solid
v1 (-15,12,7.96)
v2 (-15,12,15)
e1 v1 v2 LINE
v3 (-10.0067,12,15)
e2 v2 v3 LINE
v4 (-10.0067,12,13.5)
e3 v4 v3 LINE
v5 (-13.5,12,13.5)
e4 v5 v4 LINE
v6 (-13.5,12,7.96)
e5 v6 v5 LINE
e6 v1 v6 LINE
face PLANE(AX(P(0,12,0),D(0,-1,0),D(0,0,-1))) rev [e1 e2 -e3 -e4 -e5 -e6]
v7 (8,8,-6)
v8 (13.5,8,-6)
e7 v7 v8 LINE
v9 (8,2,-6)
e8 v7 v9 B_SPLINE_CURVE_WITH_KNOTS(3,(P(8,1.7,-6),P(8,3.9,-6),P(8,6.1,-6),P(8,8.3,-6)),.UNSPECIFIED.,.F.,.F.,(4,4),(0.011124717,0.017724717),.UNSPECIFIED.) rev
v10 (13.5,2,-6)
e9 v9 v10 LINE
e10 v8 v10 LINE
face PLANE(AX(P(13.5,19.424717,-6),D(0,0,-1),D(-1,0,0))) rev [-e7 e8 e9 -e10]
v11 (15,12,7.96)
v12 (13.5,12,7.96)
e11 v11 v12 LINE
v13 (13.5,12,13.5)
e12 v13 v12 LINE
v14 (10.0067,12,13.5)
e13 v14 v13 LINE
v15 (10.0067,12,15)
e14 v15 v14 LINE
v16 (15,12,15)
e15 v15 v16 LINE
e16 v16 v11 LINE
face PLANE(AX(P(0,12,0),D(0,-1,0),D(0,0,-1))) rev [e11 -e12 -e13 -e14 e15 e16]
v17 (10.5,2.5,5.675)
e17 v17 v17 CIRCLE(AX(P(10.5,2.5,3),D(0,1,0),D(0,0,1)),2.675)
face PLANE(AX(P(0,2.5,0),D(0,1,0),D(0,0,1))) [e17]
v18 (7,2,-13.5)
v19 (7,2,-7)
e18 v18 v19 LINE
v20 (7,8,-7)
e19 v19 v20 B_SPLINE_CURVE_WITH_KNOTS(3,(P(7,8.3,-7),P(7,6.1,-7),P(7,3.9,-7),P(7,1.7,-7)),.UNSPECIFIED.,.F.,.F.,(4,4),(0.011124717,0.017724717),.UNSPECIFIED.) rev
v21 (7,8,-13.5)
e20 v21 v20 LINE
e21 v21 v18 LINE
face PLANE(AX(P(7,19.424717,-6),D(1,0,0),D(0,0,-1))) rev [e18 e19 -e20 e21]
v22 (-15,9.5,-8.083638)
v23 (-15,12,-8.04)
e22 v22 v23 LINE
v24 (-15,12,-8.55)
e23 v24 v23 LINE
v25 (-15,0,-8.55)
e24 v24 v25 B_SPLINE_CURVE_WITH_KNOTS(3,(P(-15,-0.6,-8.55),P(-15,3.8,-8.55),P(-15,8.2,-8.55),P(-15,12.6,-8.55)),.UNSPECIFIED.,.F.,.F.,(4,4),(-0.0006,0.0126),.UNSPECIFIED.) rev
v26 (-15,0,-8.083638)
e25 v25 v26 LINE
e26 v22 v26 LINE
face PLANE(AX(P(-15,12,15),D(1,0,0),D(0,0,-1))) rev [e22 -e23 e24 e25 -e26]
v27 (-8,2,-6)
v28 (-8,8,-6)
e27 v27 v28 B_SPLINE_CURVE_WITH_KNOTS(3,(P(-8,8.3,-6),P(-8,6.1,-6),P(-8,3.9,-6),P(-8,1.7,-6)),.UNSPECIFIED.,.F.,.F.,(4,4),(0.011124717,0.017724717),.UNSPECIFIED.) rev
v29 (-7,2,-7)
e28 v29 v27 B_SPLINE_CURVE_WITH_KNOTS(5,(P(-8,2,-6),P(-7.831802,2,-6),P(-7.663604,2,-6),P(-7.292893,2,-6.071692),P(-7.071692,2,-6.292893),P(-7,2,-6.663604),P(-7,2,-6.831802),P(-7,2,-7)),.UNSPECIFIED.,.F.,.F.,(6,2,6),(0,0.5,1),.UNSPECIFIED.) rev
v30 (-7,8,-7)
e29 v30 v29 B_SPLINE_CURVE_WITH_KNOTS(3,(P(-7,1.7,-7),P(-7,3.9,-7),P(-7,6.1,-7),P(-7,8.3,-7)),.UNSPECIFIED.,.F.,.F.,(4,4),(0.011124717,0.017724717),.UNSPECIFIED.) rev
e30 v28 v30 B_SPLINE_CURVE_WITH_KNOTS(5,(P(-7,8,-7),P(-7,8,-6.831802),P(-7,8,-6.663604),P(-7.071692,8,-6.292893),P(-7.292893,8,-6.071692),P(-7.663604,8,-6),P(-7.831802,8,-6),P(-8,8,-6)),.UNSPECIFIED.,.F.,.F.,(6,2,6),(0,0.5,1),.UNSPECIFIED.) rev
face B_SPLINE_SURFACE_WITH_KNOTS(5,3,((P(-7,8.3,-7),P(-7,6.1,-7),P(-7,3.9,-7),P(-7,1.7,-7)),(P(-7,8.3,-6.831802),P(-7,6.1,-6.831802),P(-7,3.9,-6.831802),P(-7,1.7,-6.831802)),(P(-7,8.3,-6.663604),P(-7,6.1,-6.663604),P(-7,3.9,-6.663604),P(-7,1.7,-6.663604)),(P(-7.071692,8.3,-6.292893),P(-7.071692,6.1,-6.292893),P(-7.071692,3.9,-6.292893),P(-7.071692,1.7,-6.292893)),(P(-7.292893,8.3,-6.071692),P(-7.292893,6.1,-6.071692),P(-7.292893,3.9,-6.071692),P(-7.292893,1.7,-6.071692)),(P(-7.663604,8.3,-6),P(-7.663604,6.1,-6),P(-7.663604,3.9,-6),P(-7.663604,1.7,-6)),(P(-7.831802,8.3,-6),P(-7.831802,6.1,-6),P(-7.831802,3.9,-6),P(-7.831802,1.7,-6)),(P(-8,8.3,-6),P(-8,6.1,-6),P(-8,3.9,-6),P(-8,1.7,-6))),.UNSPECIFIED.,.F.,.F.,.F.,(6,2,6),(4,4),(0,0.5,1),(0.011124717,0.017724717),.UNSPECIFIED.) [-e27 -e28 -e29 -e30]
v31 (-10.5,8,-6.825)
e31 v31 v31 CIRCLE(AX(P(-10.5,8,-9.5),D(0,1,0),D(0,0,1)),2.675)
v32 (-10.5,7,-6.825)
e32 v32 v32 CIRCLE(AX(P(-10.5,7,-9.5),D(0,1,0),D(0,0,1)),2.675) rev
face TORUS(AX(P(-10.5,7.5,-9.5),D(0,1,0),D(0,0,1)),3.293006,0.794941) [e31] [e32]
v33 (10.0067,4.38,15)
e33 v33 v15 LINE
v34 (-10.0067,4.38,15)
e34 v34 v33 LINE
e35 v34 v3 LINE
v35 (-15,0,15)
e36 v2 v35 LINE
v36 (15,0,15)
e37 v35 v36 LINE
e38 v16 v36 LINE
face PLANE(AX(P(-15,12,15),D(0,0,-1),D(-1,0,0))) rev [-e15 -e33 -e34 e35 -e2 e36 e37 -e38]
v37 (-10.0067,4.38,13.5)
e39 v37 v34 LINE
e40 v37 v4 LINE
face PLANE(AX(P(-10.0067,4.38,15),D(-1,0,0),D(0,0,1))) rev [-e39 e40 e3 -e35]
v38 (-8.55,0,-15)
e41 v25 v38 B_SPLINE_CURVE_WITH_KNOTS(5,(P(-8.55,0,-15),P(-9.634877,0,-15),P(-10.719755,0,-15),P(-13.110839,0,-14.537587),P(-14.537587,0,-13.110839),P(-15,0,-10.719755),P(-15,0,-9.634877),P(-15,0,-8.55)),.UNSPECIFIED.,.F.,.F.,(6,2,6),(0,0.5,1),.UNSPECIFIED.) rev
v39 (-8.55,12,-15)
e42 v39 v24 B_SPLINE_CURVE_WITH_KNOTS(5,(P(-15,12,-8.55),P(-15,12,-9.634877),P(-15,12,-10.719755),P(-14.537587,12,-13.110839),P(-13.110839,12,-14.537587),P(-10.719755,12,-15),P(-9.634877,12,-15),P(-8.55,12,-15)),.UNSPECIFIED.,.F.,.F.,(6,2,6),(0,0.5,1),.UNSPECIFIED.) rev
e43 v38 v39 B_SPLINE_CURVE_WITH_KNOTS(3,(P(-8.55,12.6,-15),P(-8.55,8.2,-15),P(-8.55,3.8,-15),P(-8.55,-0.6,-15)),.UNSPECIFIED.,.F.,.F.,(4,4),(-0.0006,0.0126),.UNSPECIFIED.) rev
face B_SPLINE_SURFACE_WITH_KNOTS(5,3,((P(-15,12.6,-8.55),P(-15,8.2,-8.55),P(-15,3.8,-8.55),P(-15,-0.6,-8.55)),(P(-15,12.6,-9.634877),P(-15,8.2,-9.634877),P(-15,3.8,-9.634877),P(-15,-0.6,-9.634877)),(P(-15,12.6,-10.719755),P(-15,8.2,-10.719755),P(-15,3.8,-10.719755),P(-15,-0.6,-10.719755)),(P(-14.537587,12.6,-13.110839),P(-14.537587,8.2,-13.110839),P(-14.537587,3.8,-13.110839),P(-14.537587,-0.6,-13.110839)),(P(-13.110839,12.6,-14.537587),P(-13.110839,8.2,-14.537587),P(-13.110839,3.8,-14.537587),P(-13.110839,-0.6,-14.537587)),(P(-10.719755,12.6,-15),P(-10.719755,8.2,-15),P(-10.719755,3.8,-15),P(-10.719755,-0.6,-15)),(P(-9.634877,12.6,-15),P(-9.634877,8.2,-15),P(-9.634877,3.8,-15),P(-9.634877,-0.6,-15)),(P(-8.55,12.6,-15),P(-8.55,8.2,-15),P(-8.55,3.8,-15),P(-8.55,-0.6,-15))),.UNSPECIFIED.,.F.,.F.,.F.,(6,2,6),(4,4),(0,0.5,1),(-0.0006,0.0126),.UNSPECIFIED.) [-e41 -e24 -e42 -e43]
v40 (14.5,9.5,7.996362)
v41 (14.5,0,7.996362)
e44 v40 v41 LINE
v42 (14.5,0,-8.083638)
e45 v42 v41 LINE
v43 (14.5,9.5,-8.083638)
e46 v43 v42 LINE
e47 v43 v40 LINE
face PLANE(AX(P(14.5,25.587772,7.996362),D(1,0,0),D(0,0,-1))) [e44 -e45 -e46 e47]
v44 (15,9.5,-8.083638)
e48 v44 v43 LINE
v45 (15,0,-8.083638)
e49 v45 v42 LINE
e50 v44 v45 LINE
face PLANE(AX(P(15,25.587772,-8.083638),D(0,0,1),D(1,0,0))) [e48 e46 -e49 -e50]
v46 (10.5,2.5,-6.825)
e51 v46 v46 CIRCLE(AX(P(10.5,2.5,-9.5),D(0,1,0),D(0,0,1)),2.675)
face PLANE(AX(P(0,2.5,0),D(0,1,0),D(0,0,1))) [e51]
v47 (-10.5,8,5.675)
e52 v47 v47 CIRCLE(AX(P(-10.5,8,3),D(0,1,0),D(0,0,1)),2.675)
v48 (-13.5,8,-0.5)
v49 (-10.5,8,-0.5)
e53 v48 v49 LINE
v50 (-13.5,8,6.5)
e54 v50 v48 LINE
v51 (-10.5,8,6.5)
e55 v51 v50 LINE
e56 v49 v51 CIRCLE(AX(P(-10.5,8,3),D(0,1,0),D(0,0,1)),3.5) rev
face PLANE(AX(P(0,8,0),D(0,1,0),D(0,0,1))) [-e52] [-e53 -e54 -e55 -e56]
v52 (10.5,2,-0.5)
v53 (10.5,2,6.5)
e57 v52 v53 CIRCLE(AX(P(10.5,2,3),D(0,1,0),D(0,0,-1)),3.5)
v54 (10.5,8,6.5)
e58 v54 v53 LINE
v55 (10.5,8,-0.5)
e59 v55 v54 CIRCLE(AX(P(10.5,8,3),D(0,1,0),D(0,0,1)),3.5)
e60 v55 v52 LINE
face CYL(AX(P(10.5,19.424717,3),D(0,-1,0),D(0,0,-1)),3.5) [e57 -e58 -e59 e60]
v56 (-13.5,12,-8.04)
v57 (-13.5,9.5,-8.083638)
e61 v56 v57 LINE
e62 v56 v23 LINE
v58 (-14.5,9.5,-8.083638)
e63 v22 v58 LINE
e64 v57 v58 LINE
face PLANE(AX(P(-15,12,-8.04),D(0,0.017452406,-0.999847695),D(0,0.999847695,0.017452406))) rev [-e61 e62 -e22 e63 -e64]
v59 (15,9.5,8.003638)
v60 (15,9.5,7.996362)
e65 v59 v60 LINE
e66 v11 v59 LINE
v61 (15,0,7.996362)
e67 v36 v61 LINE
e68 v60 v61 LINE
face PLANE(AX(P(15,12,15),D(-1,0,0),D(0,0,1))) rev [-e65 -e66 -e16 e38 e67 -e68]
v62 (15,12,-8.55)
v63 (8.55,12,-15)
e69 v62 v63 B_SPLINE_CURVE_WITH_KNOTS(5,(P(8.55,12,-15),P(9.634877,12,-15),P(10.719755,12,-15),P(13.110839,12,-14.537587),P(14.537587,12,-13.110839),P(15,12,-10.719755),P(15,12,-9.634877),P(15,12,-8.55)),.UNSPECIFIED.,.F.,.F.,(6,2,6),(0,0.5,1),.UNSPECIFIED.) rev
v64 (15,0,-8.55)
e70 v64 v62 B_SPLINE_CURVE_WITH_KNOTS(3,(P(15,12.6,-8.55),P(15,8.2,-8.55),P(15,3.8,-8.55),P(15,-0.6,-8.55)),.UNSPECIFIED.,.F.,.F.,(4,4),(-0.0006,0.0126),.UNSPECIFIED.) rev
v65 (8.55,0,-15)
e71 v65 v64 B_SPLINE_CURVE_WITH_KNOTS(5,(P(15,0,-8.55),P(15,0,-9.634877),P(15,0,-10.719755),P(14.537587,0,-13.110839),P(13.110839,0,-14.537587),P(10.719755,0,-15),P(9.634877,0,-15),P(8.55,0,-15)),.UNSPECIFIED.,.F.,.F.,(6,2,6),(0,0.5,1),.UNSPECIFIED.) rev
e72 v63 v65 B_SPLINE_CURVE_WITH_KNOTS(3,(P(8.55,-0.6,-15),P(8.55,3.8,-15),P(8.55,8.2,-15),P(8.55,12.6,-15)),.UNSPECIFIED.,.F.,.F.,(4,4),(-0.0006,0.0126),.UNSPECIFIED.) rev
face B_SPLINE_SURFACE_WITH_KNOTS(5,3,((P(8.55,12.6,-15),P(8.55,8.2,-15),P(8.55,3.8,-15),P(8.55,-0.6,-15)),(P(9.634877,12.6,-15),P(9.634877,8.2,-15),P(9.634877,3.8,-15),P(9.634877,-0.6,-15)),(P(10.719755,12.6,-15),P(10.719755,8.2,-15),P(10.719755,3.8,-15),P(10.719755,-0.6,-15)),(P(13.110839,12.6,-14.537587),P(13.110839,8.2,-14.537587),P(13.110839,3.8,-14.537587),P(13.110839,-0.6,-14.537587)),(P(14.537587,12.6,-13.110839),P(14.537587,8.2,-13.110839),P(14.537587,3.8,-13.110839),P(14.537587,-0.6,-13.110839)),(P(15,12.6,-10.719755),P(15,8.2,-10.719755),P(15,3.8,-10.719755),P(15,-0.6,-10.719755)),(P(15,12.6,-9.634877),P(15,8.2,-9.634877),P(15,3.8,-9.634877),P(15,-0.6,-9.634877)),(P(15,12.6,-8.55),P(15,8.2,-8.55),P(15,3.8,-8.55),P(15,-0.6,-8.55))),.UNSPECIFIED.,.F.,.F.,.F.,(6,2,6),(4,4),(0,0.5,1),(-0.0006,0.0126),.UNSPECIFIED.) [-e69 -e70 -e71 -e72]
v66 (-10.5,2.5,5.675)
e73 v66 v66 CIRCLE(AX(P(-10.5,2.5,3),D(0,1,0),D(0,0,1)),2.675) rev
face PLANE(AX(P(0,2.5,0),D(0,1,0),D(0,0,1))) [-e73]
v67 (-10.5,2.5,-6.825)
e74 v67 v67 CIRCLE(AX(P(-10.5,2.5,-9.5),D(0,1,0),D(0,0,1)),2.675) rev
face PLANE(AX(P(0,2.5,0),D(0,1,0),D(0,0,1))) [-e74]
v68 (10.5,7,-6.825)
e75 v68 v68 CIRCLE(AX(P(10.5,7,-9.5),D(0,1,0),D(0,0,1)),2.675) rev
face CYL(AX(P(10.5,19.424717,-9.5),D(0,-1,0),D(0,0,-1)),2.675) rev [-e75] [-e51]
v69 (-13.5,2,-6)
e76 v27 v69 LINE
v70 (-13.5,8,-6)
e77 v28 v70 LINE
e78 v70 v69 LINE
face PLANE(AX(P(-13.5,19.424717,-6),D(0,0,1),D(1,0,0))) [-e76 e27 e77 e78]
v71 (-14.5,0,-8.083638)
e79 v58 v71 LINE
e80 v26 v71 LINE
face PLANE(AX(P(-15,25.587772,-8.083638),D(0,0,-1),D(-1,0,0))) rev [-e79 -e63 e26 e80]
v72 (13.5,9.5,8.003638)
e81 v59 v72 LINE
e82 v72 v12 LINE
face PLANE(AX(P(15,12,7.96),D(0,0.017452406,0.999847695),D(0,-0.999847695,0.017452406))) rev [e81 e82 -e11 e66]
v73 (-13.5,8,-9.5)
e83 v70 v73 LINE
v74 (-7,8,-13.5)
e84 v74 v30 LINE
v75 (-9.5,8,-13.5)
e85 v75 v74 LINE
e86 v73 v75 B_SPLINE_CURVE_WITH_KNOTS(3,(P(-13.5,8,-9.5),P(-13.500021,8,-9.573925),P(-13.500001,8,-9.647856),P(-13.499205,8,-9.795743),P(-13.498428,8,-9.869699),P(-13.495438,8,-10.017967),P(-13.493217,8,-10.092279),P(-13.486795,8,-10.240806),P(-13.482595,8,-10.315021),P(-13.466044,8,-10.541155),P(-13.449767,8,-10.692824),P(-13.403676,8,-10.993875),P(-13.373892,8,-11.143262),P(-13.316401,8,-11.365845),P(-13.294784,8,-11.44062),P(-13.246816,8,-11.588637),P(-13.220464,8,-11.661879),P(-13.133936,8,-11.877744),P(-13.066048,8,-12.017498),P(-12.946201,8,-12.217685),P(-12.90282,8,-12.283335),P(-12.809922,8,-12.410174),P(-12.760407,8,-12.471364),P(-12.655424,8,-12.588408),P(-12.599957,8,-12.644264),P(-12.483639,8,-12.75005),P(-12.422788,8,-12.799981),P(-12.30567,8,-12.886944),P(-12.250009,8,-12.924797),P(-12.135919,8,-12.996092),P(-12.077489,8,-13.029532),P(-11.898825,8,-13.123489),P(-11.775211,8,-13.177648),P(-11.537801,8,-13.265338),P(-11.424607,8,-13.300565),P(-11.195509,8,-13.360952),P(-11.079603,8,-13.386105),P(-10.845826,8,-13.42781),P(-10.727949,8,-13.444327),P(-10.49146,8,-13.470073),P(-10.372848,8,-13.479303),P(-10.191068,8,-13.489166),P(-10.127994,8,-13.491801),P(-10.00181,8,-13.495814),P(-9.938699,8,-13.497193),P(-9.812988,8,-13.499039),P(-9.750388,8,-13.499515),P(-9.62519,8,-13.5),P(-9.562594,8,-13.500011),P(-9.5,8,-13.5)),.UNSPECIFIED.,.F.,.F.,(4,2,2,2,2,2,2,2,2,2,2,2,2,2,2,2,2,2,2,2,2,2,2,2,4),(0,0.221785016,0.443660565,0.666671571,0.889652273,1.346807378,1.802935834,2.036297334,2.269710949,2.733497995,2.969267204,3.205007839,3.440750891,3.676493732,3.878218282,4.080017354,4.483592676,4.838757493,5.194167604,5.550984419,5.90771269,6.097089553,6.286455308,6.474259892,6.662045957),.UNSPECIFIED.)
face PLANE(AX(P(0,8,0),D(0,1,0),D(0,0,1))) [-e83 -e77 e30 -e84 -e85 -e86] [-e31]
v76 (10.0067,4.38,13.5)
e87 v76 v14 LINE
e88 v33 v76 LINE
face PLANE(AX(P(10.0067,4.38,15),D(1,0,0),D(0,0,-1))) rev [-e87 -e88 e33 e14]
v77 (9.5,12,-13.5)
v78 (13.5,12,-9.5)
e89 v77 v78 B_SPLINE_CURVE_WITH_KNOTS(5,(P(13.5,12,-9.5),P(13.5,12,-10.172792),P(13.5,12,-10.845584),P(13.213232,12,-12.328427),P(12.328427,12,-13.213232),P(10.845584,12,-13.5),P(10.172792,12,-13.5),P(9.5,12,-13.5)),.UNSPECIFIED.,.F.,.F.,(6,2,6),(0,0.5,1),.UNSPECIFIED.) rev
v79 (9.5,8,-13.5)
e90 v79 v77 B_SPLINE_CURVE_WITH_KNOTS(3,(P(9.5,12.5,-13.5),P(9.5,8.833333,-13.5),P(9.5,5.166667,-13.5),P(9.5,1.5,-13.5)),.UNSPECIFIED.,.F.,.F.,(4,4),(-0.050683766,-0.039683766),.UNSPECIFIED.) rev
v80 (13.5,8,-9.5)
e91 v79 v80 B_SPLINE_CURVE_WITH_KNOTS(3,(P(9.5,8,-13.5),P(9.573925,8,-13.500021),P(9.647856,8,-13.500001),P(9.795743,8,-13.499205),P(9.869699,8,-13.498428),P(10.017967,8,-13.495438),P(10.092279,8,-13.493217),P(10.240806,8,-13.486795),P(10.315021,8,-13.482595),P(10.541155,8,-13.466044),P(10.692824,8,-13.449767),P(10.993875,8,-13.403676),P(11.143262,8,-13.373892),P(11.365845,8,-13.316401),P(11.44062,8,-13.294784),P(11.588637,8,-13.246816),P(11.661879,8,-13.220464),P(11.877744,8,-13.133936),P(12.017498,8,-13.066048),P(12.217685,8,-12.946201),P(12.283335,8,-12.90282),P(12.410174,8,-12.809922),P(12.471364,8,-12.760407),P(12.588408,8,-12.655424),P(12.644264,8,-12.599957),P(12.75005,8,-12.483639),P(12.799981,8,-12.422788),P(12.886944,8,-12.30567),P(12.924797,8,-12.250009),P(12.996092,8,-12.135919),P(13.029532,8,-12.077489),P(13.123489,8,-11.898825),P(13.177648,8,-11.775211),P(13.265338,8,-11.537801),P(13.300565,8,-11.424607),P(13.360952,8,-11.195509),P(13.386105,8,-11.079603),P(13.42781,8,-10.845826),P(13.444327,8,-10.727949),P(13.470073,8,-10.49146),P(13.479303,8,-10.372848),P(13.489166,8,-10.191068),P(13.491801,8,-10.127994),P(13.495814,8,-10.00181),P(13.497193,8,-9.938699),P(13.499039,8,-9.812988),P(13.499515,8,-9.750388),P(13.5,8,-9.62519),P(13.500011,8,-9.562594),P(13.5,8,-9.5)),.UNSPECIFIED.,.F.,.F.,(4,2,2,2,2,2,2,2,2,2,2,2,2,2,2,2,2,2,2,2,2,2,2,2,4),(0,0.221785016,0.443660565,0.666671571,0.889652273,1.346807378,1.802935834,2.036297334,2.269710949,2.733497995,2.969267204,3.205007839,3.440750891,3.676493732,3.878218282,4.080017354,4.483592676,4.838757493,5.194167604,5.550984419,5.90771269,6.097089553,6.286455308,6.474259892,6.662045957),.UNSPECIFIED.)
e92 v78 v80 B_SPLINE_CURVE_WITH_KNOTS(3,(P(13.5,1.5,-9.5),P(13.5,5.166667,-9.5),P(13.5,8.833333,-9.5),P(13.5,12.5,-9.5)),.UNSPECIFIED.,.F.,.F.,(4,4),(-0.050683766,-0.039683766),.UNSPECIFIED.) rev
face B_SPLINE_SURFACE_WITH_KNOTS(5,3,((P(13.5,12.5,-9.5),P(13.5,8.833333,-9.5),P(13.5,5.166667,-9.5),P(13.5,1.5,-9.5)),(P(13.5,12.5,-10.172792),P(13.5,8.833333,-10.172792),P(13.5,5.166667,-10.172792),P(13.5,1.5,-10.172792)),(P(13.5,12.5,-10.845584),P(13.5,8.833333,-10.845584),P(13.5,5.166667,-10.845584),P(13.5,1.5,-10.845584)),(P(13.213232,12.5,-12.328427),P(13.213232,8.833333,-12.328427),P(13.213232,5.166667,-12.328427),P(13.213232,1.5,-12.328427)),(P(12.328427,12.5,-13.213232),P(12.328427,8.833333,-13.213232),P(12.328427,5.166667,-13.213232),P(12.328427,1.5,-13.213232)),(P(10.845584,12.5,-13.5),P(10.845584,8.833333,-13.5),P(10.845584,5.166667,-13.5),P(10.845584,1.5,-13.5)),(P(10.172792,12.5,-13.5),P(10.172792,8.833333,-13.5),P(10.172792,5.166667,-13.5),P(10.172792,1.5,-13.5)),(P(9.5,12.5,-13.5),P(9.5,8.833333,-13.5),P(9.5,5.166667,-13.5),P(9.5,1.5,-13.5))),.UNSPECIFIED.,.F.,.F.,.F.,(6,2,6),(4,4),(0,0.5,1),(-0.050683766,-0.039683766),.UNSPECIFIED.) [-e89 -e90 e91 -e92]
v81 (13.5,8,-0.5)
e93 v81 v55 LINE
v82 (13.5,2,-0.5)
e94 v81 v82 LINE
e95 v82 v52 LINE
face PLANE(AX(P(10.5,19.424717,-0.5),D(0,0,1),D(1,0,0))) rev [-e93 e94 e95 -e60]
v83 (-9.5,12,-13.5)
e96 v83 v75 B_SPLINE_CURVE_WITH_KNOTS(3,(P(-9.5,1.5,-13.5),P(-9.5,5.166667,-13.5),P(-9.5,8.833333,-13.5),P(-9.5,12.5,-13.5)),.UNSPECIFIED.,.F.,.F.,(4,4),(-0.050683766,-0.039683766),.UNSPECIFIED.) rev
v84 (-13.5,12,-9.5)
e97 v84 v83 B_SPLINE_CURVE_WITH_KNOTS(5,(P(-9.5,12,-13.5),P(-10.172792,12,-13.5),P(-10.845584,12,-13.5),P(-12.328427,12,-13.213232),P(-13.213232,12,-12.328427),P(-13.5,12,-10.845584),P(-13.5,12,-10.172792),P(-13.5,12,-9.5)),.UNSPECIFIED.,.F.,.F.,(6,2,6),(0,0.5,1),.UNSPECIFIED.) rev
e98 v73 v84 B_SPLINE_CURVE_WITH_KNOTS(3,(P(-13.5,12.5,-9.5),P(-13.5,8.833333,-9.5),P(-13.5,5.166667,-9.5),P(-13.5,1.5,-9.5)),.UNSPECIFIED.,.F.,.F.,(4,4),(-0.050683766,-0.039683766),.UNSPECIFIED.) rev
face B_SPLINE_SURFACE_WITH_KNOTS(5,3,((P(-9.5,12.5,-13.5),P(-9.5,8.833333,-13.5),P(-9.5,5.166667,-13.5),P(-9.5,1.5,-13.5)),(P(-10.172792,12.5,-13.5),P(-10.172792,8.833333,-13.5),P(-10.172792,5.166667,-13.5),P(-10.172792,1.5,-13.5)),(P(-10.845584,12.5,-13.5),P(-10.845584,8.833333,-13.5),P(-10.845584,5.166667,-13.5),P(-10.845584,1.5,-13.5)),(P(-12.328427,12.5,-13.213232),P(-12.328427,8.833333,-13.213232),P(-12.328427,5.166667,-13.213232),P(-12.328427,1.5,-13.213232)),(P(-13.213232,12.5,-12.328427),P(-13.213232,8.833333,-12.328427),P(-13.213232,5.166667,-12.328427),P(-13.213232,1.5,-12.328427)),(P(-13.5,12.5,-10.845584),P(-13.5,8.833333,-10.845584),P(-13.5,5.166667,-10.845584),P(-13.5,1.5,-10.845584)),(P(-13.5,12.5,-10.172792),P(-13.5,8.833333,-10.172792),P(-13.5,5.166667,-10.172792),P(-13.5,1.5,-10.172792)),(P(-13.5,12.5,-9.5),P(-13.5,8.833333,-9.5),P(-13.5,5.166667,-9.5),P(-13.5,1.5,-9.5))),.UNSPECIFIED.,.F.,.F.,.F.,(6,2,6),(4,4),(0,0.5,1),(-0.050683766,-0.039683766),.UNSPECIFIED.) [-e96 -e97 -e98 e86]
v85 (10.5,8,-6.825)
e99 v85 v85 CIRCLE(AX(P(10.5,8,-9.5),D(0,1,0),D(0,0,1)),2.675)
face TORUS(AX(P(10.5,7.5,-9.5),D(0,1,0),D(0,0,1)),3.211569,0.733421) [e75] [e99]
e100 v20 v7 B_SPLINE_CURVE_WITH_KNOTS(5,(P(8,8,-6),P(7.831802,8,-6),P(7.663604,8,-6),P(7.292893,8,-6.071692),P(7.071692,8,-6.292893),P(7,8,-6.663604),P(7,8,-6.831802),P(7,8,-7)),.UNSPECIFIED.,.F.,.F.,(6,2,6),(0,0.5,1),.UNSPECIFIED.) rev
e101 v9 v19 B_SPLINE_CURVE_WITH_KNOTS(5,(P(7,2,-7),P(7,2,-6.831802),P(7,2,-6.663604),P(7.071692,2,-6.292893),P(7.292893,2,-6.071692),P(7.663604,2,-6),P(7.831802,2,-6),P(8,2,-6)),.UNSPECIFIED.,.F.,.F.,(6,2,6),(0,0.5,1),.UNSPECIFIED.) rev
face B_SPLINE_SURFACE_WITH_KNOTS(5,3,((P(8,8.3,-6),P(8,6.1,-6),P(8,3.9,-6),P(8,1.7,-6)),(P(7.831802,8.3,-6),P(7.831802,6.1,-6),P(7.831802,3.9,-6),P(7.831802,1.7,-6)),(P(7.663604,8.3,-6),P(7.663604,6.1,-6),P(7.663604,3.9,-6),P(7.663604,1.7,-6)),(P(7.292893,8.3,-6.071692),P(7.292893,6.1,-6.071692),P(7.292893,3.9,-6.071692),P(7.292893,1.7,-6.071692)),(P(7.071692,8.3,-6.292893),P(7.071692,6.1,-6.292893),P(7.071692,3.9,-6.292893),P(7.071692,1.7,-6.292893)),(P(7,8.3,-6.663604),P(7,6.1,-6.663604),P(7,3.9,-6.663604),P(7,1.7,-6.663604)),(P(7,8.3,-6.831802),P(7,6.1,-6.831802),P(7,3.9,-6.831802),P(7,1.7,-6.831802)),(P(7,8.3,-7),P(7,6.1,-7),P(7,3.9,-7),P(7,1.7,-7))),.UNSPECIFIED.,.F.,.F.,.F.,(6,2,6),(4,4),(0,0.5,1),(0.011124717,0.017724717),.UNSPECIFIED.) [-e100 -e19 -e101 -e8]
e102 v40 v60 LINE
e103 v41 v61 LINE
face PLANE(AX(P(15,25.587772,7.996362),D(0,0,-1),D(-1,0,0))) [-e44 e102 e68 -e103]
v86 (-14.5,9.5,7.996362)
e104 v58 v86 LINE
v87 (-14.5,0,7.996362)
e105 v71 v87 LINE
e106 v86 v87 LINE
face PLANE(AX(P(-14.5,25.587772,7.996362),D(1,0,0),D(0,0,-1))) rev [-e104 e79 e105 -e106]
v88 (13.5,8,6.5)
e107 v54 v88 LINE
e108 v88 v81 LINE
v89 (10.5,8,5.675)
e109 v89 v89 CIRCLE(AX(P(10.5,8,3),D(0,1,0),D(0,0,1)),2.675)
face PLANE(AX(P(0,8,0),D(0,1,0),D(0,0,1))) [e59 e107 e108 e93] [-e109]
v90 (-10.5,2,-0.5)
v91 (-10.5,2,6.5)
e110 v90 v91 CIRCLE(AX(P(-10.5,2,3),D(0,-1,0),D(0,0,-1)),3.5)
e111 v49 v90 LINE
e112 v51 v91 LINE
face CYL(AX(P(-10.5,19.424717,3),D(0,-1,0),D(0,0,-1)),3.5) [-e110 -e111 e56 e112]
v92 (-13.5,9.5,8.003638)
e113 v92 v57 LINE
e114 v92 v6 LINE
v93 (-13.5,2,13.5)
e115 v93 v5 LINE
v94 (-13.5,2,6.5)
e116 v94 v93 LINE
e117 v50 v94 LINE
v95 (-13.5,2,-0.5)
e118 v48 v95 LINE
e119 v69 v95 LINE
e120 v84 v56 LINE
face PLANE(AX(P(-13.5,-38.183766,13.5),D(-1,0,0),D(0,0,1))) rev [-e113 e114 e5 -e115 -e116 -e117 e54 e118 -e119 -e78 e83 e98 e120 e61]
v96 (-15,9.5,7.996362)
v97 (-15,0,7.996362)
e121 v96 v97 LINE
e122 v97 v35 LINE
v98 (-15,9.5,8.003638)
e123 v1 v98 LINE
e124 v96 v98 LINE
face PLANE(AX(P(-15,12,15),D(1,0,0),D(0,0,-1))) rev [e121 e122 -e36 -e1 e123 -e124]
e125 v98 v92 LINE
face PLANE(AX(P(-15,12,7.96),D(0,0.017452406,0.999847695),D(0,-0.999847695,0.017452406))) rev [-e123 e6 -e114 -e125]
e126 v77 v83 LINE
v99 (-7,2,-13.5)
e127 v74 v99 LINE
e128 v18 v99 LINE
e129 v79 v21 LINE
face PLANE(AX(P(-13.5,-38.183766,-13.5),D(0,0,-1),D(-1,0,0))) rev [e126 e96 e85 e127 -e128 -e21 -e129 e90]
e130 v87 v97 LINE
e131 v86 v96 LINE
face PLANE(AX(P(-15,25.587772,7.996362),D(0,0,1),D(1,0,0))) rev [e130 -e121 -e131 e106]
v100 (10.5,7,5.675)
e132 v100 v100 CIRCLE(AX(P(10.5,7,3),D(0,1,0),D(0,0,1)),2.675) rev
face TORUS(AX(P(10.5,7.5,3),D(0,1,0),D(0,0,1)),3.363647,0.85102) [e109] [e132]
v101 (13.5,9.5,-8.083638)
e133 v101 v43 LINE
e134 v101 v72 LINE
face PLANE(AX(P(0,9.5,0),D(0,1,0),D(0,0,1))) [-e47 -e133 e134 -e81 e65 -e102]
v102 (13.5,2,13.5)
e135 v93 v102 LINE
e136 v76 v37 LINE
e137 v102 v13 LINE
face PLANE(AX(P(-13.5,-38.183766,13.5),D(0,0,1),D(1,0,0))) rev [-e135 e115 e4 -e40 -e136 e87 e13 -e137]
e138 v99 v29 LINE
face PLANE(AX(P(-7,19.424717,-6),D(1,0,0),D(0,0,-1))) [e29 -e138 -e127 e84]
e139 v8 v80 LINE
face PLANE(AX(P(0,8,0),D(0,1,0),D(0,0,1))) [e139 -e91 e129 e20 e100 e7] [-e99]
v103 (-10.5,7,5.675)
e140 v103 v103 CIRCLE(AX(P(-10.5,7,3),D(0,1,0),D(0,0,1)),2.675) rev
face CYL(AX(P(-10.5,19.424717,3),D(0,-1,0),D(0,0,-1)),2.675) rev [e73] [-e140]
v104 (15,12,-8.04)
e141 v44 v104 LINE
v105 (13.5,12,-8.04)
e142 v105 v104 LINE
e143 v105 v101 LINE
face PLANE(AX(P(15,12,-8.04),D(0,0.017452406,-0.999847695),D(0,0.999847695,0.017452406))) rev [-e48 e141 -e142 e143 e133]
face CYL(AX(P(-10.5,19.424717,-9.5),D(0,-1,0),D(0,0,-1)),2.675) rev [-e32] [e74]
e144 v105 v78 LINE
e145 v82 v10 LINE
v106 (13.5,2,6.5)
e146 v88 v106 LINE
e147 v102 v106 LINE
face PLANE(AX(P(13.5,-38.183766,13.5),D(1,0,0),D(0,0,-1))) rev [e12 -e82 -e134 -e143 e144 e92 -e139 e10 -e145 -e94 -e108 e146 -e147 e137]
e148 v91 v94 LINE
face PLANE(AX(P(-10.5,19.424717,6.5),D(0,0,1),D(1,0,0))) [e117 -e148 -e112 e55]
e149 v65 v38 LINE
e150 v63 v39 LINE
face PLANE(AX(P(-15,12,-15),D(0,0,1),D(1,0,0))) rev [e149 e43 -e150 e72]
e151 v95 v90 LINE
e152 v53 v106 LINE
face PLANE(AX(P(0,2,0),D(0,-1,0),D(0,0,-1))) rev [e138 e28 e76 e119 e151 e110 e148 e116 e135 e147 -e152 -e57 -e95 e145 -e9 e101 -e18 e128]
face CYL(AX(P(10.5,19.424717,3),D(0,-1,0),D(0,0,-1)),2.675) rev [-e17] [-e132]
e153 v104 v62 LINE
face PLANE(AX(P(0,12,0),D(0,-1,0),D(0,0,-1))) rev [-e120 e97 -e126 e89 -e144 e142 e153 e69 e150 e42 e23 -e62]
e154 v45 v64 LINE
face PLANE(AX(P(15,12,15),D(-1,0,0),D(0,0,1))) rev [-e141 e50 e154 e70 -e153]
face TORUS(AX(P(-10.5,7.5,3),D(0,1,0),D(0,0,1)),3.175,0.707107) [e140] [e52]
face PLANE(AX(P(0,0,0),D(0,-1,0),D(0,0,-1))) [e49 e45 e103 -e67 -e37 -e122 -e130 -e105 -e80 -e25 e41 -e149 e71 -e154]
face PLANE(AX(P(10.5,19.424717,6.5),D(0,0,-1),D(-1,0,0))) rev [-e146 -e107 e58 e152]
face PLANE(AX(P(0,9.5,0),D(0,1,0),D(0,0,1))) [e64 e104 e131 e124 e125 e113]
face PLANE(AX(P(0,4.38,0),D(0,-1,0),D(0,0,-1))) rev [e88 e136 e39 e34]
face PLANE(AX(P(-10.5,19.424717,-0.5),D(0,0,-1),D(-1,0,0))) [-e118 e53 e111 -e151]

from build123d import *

# Parameters (mm, degrees)
SKETCH1_W            = 30.000000000000004
SKETCH1_H            = 30.000000000000004
BOSS_EXTRUDE3_DEPTH  = 12
SKETCH2_W            = 26.999999999999993
SKETCH2_H            = 27.000000000000007
CUT_EXTRUDE1_DEPTH   = 10
FILLET1_START        = -1
FILLET1_DEPTH        = 13
FILLET1_START_2      = 1.13256
FILLET1_2_DEPTH      = 10.86744
CUT_EXTRUDE2_DEPTH   = 2.5
CUT_EXTRUDE2_DRAFT   = 1.0000000000000042
MIRROR1_COPY_1_DEPTH = 2.5
MIRROR1_COPY_1_DRAFT = 1.0000000000000042
CUT_EXTRUDE3_DEPTH   = 7.62
SKETCH6_R            = 2.6750000000000007
BOSS_EXTRUDE4_DEPTH  = 6
SKETCH6_2_R          = 2.6750000000000007
BOSS_EXTRUDE5_DEPTH  = 0.5
CUT_EXTRUDE4_REACH   = 26.372
FILLET2_SIZE         = 1


with BuildPart() as part:
    # Sketch1 → Boss-Extrude3 (new body)
    with BuildSketch(Plane(origin=(0, 0, 0), x_dir=(1, 0, 0), z_dir=(0, 1, 0))):
        Rectangle(SKETCH1_W, SKETCH1_H)
    extrude(amount=BOSS_EXTRUDE3_DEPTH)

    # Sketch2 → Cut-Extrude1 (cut)
    with BuildSketch(Plane(origin=(0, 12, 0), x_dir=(1, 0, 0), z_dir=(0, 1, 0))):
        Rectangle(SKETCH2_W, SKETCH2_H)
    extrude(amount=-CUT_EXTRUDE1_DEPTH, mode=Mode.SUBTRACT)

    # Fillet1: read off the stored shape, not the designer's step
    # Fillet1 outline → Fillet1 (cut)
    with BuildSketch(Plane(origin=(0, 0, 0), x_dir=(1, 0, 0), z_dir=(0, 1, 0)).offset(FILLET1_START)):
        with BuildLine():
            Line((-8.55, 15), (8.55, 15))
            add(Edge.make_bspline(
                [(8.55, 15), (9.63487743239395, 15), (10.7197548647879, 15), (13.1108387386532, 14.5375871170573), (14.5375871170573, 13.1108387386532), (15, 10.7197548647879), (15, 9.63487743239395), (15, 8.55)],
                knots=[0, 0, 0, 0, 0, 0, 0.5, 0.5, 1, 1, 1, 1, 1, 1], degree=5))
            Line((15, 8.55), (15, 7))
            Line((15, 7), (17, 7))
            Line((17, 7), (17, 17))
            Line((17, 17), (-17, 17))
            Line((-17, 17), (-17, 7))
            Line((-17, 7), (-15, 7))
            Line((-15, 7), (-15, 8.55))
            add(Edge.make_bspline(
                [(-15, 8.55), (-15, 9.63487743239395), (-15, 10.7197548647879), (-14.5375871170573, 13.1108387386532), (-13.1108387386532, 14.5375871170573), (-10.7197548647879, 15), (-9.63487743239395, 15), (-8.55, 15)],
                knots=[0, 0, 0, 0, 0, 0, 0.5, 0.5, 1, 1, 1, 1, 1, 1], degree=5))
        make_face()
    extrude(amount=FILLET1_DEPTH, mode=Mode.SUBTRACT)

    # Fillet1 2 outline → Fillet1 2 (add)
    with BuildSketch(Plane(origin=(0, 0, 0), x_dir=(1, 0, 0), z_dir=(0, 1, 0)).offset(FILLET1_START_2)):
        with BuildLine():
            add(Edge.make_bspline(
                [(8.55, 15), (9.63487743239395, 15), (10.7197548647879, 15), (13.1108387386532, 14.5375871170573), (14.5375871170573, 13.1108387386532), (15, 10.7197548647879), (15, 9.63487743239395), (15, 8.55)],
                knots=[0, 0, 0, 0, 0, 0, 0.5, 0.5, 1, 1, 1, 1, 1, 1], degree=5))
            Line((8.55, 15), (-8.55, 15))
            add(Edge.make_bspline(
                [(-15, 8.55), (-15, 9.63487743239395), (-15, 10.7197548647879), (-14.5375871170573, 13.1108387386532), (-13.1108387386532, 14.5375871170573), (-10.7197548647879, 15), (-9.63487743239395, 15), (-8.55, 15)],
                knots=[0, 0, 0, 0, 0, 0, 0.5, 0.5, 1, 1, 1, 1, 1, 1], degree=5))
            Line((-15, 8.55), (-15, 7))
            Line((-15, 7), (-13.5, 7))
            Line((-13.5, 7), (-13.5, 9.5))
            add(Edge.make_bspline(
                [(-9.5, 13.5), (-10.1727922061358, 13.5), (-10.8455844122716, 13.5), (-12.3284271247462, 13.2132323206557), (-13.2132323206557, 12.3284271247462), (-13.5, 10.8455844122716), (-13.5, 10.1727922061358), (-13.5, 9.5)],
                knots=[0, 0, 0, 0, 0, 0, 0.5, 0.5, 1, 1, 1, 1, 1, 1], degree=5))
            Line((-9.5, 13.5), (9.5, 13.5))
            add(Edge.make_bspline(
                [(13.5, 9.5), (13.5, 10.1727922061358), (13.5, 10.8455844122716), (13.2132323206557, 12.3284271247462), (12.3284271247462, 13.2132323206557), (10.8455844122716, 13.5), (10.1727922061358, 13.5), (9.5, 13.5)],
                knots=[0, 0, 0, 0, 0, 0, 0.5, 0.5, 1, 1, 1, 1, 1, 1], degree=5))
            Line((13.5, 9.5), (13.5, 7))
            Line((13.5, 7), (15, 7))
            Line((15, 7), (15, 8.55))
        make_face()
    extrude(amount=FILLET1_2_DEPTH)


with BuildPart() as cut_extrude2_tool:
    # Sketch3 → Cut-Extrude2 (with draft: the straight prism first)
    with BuildSketch(Plane(origin=(0, 12, 0), x_dir=(1, 0, 0), z_dir=(0, 1, 0))):
        Polygon((-15.000000000000002, 8.040000000000003), (-14.999999999999998, -7.959999999999998), (-13.499999999999986, -7.959999999999998), (-13.499999999999988, 8.040000000000003), align=None)
    extrude(amount=-CUT_EXTRUDE2_DEPTH)
    # Cut-Extrude2: the draft: its side faces are tilted about the plane it starts from
    cut_extrude2_sides = [cut_extrude2_tool.faces().sort_by_distance(p)[0] for p in [
        (-15, 10.75, -0.04),
        (-14.25, 10.75, 7.96),
        (-13.5, 10.75, -0.04),
        (-14.25, 10.75, -8.04),
    ]]
    draft(cut_extrude2_sides, Plane(origin=(0, 12, 0), x_dir=(1, 0, 0), z_dir=(0, 1, 0)), CUT_EXTRUDE2_DRAFT)


with BuildPart() as part_1:
    add(part.part)

    # Cut-Extrude2: cut by cut_extrude2_tool
    add(cut_extrude2_tool.part, mode=Mode.SUBTRACT)


with BuildPart() as mirror1_copy_1_tool:
    # Mirror1 copy 1 sketch → Mirror1 copy 1 (with draft: the straight prism first)
    with BuildSketch(Plane(origin=(0, 12, 0), x_dir=(-1, 0, 0), z_dir=(0, 1, 0))):
        Polygon((-15.000000000000002, -8.040000000000003), (-14.999999999999998, 7.959999999999998), (-13.499999999999986, 7.959999999999998), (-13.499999999999988, -8.040000000000003), align=None)
    extrude(amount=-MIRROR1_COPY_1_DEPTH)
    # Mirror1 copy 1: the draft: its side faces are tilted about the plane it starts from
    mirror1_copy_1_sides = [mirror1_copy_1_tool.faces().sort_by_distance(p)[0] for p in [
        (15, 10.75, -0.04),
        (14.25, 10.75, 7.96),
        (13.5, 10.75, -0.04),
        (14.25, 10.75, -8.04),
    ]]
    draft(mirror1_copy_1_sides, Plane(origin=(0, 12, 0), x_dir=(-1, 0, 0), z_dir=(0, 1, 0)), MIRROR1_COPY_1_DRAFT)


with BuildPart() as part_2:
    add(part_1.part)

    # Mirror1 copy 1: cut by mirror1_copy_1_tool
    add(mirror1_copy_1_tool.part, mode=Mode.SUBTRACT)

    # Sketch5 → Cut-Extrude3 (cut)
    with BuildSketch(Plane(origin=(0, 12, 0), x_dir=(1, 0, 0), z_dir=(0, 1, 0))):
        Polygon((-10.006699639770744, -14.999999999999998), (10.006699639770742, -14.999999999999998), (10.006699639770742, -13.5), (-10.006699639770742, -13.500000000000002), align=None)
    extrude(amount=-CUT_EXTRUDE3_DEPTH, mode=Mode.SUBTRACT)

    # Sketch6 → Boss-Extrude4 (add)
    # profile 1 of 2: a face of its own
    with BuildSketch(Plane(origin=(0, 2, 0), x_dir=(1, 0, 0), z_dir=(0, 1, 0))):
        with BuildLine():
            Line((10.49999999999986, -6.5), (13.5, -6.5))
            Line((13.5, -6.5), (13.5, 0.5000000000000004))
            Line((13.5, 0.5000000000000004), (10.49999999999986, 0.5000000000000004))
            ThreePointArc((10.49999999999986, 0.5000000000000004), (6.99999999999986, -3), (10.49999999999986, -6.5))
        make_face()
        with Locations(Location((10.49999999999986, -2.9999999999999996, 0), (0, 0, 270))):
            Circle(SKETCH6_R, mode=Mode.SUBTRACT)
    # profile 2 of 2: a face of its own
    with BuildSketch(Plane(origin=(0, 2, 0), x_dir=(1, 0, 0), z_dir=(0, 1, 0))):
        Polygon((13.5, 9.500000000000004), (13.5, 6.0000000000000036), (7, 6.000000000000003), (7, 13.500000000000004), (13.5, 13.500000000000004), align=None)
        with Locations(Location((10.49999999999986, 9.5, 0), (0, 0, 270))):
            Circle(SKETCH6_R, mode=Mode.SUBTRACT)
    boss_extrude4 = extrude(amount=BOSS_EXTRUDE4_DEPTH)

    # Sketch6<2> → Boss-Extrude5 (add)
    with BuildSketch(Plane(origin=(0, 2, 0), x_dir=(1, 0, 0), z_dir=(0, 1, 0))):
        with Locations(Location((10.49999999999986, 9.5, 0), (0, 0, 270))):
            Circle(SKETCH6_2_R)
        with Locations(Location((10.49999999999986, -2.9999999999999996, 0), (0, 0, 270))):
            Circle(SKETCH6_2_R)
    boss_extrude5 = extrude(amount=BOSS_EXTRUDE5_DEPTH)

    # Cut-Extrude4: up to this face of the body (flat: up to its plane)
    cut_extrude4_end = Plane(part_2.part.faces().sort_by_distance((-14.25, 9.5, -0.04))[0])
    # Sketch13 → Cut-Extrude4 (cut, up to the picked face)
    with BuildSketch(Plane(origin=(0, 0, 0), x_dir=(-1, 0, 0), z_dir=(0, -1, 0)), mode=Mode.PRIVATE) as cut_extrude4_sk1:
        Polygon((14.999999999999998, -7.99636233767945), (14.499999999999996, -7.99636233767945), (14.5, 8.083637662320546), (15, 8.083637662320546), align=None)
    cut_extrude4_tool1 = split(extrude(cut_extrude4_sk1.sketch, amount=-CUT_EXTRUDE4_REACH, mode=Mode.PRIVATE), bisect_by=cut_extrude4_end, keep=Keep.BOTH, mode=Mode.PRIVATE)
    cut_extrude4 = cut_extrude4_tool1.solids().sort_by(Axis((-14.75, 0, -0.043638), (0, 1, 0)))[0]
    add(cut_extrude4, mode=Mode.SUBTRACT)

    # Mirror2: Boss-Extrude4, Boss-Extrude5, Cut-Extrude4 across plane
    add(boss_extrude4.mirror(Plane.ZY))
    add(boss_extrude5.mirror(Plane.ZY))
    add(cut_extrude4.mirror(Plane.ZY), mode=Mode.SUBTRACT)

    # Fillet2
    # a fillet whose section is not a circle: 1 mm, written as the material it takes off along each edge
    with BuildSketch(Plane(origin=(-7, 2, -6.000000000000003), x_dir=(-1, 0, 0), z_dir=(0, 1, 0))) as fillet2_piece_1:
        with BuildLine():
            add(Edge.make_bspline([(FILLET2_SIZE, 0), (FILLET2_SIZE * 0.831801948466, 0), (FILLET2_SIZE * 0.663603896932, 0), (FILLET2_SIZE * 0.292893218813, -FILLET2_SIZE * 0.0716919198361), (FILLET2_SIZE * 0.0716919198361, -FILLET2_SIZE * 0.292893218813), (0, -FILLET2_SIZE * 0.663603896932), (0, -FILLET2_SIZE * 0.831801948466), (0, -FILLET2_SIZE)], knots=[0, 0, 0, 0, 0, 0, 0.5, 0.5, 1, 1, 1, 1, 1, 1], degree=5))
            Line((0, -FILLET2_SIZE), (0, 0))
            Line((0, 0), (FILLET2_SIZE, 0))
        make_face()
    extrude(amount=8.5, mode=Mode.SUBTRACT)
    with BuildSketch(Plane(origin=(7, 2, -6.000000000000003), x_dir=(1, 0, 0), z_dir=(0, 1, 0))) as fillet2_piece_2:
        with BuildLine():
            add(Edge.make_bspline([(FILLET2_SIZE, 0), (FILLET2_SIZE * 0.831801948466, 0), (FILLET2_SIZE * 0.663603896932, 0), (FILLET2_SIZE * 0.292893218813, FILLET2_SIZE * 0.0716919198361), (FILLET2_SIZE * 0.0716919198361, FILLET2_SIZE * 0.292893218813), (0, FILLET2_SIZE * 0.663603896932), (0, FILLET2_SIZE * 0.831801948466), (0, FILLET2_SIZE)], knots=[0, 0, 0, 0, 0, 0, 0.5, 0.5, 1, 1, 1, 1, 1, 1], degree=5))
            Line((0, FILLET2_SIZE), (0, 0))
            Line((0, 0), (FILLET2_SIZE, 0))
        make_face()
    extrude(amount=8.5, mode=Mode.SUBTRACT)

    # Sketch9 → Revolve1 (revolve)
    with BuildSketch(Plane(origin=(-12.240866923994627, 8, -7.468988588672871), x_dir=(-0.6507913734559867, 0, 0.7592566023652811), z_dir=(-0.7592566023652811, 0, -0.6507913734559867)), mode=Mode.PRIVATE) as revolve1_sk:
        with BuildLine():
            Line((0, -1), (0, 0))
            ThreePointArc((0, 0), (-0.17693514578671132, -0.4999999999999999), (0, -1))
        make_face()
    revolve(revolve1_sk.sketch.rotate(Axis((-10.49999999999986, 19.424716620639604, -9.5), (0, -1, 0)), 319.398705355), axis=Axis((-10.49999999999986, 19.424716620639604, -9.5), (0, -1, 0)))

    # Sketch10 → Revolve2 (revolve)
    with BuildSketch(Plane(origin=(12.240866923994627, 8, -7.468988588672871), x_dir=(-0.6507913734559867, 0, -0.7592566023652811), z_dir=(0.7592566023652811, 0, -0.6507913734559867)), mode=Mode.PRIVATE) as revolve2_sk:
        with BuildLine():
            Line((0, -1), (0, 0))
            ThreePointArc((0, 0), (0.19685183327597433, -0.5), (0, -1))
        make_face()
    revolve(revolve2_sk.sketch.rotate(Axis((10.49999999999986, 19.424716620639604, -9.5), (0, -1, 0)), 40.601294645), axis=Axis((10.49999999999986, 19.424716620639604, -9.5), (0, -1, 0)))

    # Sketch11 → Revolve3 (revolve)
    with BuildSketch(Plane(origin=(-12.240866923994624, 8, 5.031011411327126), x_dir=(-0.650791373455986, 0, 0.7592566023652817), z_dir=(-0.7592566023652816, 0, -0.6507913734559859)), mode=Mode.PRIVATE) as revolve3_sk:
        with BuildLine():
            Line((0, 0), (1.2e-16, -1))
            ThreePointArc((1.2e-16, -1), (-0.20710678118654702, -0.4999999999999998), (0, 0))
        make_face()
    revolve(revolve3_sk.sketch.rotate(Axis((-10.49999999999986, 19.424716620639604, 2.9999999999999996), (0, -1, 0)), 319.398705355), axis=Axis((-10.49999999999986, 19.424716620639604, 2.9999999999999996), (0, -1, 0)))

    # Sketch12 → Revolve4 (revolve)
    with BuildSketch(Plane(origin=(12.240866923994624, 8, 5.031011411327126), x_dir=(-0.650791373455986, 0, -0.7592566023652817), z_dir=(0.7592566023652816, 0, -0.6507913734559859)), mode=Mode.PRIVATE) as revolve4_sk:
        with BuildLine():
            Line((0, -1), (0, 0))
            ThreePointArc((0, 0), (0.16237280325092585, -0.5), (0, -1))
        make_face()
    revolve(revolve4_sk.sketch.rotate(Axis((10.49999999999986, 19.424716620639604, 2.9999999999999996), (0, -1, 0)), 40.601294645), axis=Axis((10.49999999999986, 19.424716620639604, 2.9999999999999996), (0, -1, 0)))


solid = part_2.part
